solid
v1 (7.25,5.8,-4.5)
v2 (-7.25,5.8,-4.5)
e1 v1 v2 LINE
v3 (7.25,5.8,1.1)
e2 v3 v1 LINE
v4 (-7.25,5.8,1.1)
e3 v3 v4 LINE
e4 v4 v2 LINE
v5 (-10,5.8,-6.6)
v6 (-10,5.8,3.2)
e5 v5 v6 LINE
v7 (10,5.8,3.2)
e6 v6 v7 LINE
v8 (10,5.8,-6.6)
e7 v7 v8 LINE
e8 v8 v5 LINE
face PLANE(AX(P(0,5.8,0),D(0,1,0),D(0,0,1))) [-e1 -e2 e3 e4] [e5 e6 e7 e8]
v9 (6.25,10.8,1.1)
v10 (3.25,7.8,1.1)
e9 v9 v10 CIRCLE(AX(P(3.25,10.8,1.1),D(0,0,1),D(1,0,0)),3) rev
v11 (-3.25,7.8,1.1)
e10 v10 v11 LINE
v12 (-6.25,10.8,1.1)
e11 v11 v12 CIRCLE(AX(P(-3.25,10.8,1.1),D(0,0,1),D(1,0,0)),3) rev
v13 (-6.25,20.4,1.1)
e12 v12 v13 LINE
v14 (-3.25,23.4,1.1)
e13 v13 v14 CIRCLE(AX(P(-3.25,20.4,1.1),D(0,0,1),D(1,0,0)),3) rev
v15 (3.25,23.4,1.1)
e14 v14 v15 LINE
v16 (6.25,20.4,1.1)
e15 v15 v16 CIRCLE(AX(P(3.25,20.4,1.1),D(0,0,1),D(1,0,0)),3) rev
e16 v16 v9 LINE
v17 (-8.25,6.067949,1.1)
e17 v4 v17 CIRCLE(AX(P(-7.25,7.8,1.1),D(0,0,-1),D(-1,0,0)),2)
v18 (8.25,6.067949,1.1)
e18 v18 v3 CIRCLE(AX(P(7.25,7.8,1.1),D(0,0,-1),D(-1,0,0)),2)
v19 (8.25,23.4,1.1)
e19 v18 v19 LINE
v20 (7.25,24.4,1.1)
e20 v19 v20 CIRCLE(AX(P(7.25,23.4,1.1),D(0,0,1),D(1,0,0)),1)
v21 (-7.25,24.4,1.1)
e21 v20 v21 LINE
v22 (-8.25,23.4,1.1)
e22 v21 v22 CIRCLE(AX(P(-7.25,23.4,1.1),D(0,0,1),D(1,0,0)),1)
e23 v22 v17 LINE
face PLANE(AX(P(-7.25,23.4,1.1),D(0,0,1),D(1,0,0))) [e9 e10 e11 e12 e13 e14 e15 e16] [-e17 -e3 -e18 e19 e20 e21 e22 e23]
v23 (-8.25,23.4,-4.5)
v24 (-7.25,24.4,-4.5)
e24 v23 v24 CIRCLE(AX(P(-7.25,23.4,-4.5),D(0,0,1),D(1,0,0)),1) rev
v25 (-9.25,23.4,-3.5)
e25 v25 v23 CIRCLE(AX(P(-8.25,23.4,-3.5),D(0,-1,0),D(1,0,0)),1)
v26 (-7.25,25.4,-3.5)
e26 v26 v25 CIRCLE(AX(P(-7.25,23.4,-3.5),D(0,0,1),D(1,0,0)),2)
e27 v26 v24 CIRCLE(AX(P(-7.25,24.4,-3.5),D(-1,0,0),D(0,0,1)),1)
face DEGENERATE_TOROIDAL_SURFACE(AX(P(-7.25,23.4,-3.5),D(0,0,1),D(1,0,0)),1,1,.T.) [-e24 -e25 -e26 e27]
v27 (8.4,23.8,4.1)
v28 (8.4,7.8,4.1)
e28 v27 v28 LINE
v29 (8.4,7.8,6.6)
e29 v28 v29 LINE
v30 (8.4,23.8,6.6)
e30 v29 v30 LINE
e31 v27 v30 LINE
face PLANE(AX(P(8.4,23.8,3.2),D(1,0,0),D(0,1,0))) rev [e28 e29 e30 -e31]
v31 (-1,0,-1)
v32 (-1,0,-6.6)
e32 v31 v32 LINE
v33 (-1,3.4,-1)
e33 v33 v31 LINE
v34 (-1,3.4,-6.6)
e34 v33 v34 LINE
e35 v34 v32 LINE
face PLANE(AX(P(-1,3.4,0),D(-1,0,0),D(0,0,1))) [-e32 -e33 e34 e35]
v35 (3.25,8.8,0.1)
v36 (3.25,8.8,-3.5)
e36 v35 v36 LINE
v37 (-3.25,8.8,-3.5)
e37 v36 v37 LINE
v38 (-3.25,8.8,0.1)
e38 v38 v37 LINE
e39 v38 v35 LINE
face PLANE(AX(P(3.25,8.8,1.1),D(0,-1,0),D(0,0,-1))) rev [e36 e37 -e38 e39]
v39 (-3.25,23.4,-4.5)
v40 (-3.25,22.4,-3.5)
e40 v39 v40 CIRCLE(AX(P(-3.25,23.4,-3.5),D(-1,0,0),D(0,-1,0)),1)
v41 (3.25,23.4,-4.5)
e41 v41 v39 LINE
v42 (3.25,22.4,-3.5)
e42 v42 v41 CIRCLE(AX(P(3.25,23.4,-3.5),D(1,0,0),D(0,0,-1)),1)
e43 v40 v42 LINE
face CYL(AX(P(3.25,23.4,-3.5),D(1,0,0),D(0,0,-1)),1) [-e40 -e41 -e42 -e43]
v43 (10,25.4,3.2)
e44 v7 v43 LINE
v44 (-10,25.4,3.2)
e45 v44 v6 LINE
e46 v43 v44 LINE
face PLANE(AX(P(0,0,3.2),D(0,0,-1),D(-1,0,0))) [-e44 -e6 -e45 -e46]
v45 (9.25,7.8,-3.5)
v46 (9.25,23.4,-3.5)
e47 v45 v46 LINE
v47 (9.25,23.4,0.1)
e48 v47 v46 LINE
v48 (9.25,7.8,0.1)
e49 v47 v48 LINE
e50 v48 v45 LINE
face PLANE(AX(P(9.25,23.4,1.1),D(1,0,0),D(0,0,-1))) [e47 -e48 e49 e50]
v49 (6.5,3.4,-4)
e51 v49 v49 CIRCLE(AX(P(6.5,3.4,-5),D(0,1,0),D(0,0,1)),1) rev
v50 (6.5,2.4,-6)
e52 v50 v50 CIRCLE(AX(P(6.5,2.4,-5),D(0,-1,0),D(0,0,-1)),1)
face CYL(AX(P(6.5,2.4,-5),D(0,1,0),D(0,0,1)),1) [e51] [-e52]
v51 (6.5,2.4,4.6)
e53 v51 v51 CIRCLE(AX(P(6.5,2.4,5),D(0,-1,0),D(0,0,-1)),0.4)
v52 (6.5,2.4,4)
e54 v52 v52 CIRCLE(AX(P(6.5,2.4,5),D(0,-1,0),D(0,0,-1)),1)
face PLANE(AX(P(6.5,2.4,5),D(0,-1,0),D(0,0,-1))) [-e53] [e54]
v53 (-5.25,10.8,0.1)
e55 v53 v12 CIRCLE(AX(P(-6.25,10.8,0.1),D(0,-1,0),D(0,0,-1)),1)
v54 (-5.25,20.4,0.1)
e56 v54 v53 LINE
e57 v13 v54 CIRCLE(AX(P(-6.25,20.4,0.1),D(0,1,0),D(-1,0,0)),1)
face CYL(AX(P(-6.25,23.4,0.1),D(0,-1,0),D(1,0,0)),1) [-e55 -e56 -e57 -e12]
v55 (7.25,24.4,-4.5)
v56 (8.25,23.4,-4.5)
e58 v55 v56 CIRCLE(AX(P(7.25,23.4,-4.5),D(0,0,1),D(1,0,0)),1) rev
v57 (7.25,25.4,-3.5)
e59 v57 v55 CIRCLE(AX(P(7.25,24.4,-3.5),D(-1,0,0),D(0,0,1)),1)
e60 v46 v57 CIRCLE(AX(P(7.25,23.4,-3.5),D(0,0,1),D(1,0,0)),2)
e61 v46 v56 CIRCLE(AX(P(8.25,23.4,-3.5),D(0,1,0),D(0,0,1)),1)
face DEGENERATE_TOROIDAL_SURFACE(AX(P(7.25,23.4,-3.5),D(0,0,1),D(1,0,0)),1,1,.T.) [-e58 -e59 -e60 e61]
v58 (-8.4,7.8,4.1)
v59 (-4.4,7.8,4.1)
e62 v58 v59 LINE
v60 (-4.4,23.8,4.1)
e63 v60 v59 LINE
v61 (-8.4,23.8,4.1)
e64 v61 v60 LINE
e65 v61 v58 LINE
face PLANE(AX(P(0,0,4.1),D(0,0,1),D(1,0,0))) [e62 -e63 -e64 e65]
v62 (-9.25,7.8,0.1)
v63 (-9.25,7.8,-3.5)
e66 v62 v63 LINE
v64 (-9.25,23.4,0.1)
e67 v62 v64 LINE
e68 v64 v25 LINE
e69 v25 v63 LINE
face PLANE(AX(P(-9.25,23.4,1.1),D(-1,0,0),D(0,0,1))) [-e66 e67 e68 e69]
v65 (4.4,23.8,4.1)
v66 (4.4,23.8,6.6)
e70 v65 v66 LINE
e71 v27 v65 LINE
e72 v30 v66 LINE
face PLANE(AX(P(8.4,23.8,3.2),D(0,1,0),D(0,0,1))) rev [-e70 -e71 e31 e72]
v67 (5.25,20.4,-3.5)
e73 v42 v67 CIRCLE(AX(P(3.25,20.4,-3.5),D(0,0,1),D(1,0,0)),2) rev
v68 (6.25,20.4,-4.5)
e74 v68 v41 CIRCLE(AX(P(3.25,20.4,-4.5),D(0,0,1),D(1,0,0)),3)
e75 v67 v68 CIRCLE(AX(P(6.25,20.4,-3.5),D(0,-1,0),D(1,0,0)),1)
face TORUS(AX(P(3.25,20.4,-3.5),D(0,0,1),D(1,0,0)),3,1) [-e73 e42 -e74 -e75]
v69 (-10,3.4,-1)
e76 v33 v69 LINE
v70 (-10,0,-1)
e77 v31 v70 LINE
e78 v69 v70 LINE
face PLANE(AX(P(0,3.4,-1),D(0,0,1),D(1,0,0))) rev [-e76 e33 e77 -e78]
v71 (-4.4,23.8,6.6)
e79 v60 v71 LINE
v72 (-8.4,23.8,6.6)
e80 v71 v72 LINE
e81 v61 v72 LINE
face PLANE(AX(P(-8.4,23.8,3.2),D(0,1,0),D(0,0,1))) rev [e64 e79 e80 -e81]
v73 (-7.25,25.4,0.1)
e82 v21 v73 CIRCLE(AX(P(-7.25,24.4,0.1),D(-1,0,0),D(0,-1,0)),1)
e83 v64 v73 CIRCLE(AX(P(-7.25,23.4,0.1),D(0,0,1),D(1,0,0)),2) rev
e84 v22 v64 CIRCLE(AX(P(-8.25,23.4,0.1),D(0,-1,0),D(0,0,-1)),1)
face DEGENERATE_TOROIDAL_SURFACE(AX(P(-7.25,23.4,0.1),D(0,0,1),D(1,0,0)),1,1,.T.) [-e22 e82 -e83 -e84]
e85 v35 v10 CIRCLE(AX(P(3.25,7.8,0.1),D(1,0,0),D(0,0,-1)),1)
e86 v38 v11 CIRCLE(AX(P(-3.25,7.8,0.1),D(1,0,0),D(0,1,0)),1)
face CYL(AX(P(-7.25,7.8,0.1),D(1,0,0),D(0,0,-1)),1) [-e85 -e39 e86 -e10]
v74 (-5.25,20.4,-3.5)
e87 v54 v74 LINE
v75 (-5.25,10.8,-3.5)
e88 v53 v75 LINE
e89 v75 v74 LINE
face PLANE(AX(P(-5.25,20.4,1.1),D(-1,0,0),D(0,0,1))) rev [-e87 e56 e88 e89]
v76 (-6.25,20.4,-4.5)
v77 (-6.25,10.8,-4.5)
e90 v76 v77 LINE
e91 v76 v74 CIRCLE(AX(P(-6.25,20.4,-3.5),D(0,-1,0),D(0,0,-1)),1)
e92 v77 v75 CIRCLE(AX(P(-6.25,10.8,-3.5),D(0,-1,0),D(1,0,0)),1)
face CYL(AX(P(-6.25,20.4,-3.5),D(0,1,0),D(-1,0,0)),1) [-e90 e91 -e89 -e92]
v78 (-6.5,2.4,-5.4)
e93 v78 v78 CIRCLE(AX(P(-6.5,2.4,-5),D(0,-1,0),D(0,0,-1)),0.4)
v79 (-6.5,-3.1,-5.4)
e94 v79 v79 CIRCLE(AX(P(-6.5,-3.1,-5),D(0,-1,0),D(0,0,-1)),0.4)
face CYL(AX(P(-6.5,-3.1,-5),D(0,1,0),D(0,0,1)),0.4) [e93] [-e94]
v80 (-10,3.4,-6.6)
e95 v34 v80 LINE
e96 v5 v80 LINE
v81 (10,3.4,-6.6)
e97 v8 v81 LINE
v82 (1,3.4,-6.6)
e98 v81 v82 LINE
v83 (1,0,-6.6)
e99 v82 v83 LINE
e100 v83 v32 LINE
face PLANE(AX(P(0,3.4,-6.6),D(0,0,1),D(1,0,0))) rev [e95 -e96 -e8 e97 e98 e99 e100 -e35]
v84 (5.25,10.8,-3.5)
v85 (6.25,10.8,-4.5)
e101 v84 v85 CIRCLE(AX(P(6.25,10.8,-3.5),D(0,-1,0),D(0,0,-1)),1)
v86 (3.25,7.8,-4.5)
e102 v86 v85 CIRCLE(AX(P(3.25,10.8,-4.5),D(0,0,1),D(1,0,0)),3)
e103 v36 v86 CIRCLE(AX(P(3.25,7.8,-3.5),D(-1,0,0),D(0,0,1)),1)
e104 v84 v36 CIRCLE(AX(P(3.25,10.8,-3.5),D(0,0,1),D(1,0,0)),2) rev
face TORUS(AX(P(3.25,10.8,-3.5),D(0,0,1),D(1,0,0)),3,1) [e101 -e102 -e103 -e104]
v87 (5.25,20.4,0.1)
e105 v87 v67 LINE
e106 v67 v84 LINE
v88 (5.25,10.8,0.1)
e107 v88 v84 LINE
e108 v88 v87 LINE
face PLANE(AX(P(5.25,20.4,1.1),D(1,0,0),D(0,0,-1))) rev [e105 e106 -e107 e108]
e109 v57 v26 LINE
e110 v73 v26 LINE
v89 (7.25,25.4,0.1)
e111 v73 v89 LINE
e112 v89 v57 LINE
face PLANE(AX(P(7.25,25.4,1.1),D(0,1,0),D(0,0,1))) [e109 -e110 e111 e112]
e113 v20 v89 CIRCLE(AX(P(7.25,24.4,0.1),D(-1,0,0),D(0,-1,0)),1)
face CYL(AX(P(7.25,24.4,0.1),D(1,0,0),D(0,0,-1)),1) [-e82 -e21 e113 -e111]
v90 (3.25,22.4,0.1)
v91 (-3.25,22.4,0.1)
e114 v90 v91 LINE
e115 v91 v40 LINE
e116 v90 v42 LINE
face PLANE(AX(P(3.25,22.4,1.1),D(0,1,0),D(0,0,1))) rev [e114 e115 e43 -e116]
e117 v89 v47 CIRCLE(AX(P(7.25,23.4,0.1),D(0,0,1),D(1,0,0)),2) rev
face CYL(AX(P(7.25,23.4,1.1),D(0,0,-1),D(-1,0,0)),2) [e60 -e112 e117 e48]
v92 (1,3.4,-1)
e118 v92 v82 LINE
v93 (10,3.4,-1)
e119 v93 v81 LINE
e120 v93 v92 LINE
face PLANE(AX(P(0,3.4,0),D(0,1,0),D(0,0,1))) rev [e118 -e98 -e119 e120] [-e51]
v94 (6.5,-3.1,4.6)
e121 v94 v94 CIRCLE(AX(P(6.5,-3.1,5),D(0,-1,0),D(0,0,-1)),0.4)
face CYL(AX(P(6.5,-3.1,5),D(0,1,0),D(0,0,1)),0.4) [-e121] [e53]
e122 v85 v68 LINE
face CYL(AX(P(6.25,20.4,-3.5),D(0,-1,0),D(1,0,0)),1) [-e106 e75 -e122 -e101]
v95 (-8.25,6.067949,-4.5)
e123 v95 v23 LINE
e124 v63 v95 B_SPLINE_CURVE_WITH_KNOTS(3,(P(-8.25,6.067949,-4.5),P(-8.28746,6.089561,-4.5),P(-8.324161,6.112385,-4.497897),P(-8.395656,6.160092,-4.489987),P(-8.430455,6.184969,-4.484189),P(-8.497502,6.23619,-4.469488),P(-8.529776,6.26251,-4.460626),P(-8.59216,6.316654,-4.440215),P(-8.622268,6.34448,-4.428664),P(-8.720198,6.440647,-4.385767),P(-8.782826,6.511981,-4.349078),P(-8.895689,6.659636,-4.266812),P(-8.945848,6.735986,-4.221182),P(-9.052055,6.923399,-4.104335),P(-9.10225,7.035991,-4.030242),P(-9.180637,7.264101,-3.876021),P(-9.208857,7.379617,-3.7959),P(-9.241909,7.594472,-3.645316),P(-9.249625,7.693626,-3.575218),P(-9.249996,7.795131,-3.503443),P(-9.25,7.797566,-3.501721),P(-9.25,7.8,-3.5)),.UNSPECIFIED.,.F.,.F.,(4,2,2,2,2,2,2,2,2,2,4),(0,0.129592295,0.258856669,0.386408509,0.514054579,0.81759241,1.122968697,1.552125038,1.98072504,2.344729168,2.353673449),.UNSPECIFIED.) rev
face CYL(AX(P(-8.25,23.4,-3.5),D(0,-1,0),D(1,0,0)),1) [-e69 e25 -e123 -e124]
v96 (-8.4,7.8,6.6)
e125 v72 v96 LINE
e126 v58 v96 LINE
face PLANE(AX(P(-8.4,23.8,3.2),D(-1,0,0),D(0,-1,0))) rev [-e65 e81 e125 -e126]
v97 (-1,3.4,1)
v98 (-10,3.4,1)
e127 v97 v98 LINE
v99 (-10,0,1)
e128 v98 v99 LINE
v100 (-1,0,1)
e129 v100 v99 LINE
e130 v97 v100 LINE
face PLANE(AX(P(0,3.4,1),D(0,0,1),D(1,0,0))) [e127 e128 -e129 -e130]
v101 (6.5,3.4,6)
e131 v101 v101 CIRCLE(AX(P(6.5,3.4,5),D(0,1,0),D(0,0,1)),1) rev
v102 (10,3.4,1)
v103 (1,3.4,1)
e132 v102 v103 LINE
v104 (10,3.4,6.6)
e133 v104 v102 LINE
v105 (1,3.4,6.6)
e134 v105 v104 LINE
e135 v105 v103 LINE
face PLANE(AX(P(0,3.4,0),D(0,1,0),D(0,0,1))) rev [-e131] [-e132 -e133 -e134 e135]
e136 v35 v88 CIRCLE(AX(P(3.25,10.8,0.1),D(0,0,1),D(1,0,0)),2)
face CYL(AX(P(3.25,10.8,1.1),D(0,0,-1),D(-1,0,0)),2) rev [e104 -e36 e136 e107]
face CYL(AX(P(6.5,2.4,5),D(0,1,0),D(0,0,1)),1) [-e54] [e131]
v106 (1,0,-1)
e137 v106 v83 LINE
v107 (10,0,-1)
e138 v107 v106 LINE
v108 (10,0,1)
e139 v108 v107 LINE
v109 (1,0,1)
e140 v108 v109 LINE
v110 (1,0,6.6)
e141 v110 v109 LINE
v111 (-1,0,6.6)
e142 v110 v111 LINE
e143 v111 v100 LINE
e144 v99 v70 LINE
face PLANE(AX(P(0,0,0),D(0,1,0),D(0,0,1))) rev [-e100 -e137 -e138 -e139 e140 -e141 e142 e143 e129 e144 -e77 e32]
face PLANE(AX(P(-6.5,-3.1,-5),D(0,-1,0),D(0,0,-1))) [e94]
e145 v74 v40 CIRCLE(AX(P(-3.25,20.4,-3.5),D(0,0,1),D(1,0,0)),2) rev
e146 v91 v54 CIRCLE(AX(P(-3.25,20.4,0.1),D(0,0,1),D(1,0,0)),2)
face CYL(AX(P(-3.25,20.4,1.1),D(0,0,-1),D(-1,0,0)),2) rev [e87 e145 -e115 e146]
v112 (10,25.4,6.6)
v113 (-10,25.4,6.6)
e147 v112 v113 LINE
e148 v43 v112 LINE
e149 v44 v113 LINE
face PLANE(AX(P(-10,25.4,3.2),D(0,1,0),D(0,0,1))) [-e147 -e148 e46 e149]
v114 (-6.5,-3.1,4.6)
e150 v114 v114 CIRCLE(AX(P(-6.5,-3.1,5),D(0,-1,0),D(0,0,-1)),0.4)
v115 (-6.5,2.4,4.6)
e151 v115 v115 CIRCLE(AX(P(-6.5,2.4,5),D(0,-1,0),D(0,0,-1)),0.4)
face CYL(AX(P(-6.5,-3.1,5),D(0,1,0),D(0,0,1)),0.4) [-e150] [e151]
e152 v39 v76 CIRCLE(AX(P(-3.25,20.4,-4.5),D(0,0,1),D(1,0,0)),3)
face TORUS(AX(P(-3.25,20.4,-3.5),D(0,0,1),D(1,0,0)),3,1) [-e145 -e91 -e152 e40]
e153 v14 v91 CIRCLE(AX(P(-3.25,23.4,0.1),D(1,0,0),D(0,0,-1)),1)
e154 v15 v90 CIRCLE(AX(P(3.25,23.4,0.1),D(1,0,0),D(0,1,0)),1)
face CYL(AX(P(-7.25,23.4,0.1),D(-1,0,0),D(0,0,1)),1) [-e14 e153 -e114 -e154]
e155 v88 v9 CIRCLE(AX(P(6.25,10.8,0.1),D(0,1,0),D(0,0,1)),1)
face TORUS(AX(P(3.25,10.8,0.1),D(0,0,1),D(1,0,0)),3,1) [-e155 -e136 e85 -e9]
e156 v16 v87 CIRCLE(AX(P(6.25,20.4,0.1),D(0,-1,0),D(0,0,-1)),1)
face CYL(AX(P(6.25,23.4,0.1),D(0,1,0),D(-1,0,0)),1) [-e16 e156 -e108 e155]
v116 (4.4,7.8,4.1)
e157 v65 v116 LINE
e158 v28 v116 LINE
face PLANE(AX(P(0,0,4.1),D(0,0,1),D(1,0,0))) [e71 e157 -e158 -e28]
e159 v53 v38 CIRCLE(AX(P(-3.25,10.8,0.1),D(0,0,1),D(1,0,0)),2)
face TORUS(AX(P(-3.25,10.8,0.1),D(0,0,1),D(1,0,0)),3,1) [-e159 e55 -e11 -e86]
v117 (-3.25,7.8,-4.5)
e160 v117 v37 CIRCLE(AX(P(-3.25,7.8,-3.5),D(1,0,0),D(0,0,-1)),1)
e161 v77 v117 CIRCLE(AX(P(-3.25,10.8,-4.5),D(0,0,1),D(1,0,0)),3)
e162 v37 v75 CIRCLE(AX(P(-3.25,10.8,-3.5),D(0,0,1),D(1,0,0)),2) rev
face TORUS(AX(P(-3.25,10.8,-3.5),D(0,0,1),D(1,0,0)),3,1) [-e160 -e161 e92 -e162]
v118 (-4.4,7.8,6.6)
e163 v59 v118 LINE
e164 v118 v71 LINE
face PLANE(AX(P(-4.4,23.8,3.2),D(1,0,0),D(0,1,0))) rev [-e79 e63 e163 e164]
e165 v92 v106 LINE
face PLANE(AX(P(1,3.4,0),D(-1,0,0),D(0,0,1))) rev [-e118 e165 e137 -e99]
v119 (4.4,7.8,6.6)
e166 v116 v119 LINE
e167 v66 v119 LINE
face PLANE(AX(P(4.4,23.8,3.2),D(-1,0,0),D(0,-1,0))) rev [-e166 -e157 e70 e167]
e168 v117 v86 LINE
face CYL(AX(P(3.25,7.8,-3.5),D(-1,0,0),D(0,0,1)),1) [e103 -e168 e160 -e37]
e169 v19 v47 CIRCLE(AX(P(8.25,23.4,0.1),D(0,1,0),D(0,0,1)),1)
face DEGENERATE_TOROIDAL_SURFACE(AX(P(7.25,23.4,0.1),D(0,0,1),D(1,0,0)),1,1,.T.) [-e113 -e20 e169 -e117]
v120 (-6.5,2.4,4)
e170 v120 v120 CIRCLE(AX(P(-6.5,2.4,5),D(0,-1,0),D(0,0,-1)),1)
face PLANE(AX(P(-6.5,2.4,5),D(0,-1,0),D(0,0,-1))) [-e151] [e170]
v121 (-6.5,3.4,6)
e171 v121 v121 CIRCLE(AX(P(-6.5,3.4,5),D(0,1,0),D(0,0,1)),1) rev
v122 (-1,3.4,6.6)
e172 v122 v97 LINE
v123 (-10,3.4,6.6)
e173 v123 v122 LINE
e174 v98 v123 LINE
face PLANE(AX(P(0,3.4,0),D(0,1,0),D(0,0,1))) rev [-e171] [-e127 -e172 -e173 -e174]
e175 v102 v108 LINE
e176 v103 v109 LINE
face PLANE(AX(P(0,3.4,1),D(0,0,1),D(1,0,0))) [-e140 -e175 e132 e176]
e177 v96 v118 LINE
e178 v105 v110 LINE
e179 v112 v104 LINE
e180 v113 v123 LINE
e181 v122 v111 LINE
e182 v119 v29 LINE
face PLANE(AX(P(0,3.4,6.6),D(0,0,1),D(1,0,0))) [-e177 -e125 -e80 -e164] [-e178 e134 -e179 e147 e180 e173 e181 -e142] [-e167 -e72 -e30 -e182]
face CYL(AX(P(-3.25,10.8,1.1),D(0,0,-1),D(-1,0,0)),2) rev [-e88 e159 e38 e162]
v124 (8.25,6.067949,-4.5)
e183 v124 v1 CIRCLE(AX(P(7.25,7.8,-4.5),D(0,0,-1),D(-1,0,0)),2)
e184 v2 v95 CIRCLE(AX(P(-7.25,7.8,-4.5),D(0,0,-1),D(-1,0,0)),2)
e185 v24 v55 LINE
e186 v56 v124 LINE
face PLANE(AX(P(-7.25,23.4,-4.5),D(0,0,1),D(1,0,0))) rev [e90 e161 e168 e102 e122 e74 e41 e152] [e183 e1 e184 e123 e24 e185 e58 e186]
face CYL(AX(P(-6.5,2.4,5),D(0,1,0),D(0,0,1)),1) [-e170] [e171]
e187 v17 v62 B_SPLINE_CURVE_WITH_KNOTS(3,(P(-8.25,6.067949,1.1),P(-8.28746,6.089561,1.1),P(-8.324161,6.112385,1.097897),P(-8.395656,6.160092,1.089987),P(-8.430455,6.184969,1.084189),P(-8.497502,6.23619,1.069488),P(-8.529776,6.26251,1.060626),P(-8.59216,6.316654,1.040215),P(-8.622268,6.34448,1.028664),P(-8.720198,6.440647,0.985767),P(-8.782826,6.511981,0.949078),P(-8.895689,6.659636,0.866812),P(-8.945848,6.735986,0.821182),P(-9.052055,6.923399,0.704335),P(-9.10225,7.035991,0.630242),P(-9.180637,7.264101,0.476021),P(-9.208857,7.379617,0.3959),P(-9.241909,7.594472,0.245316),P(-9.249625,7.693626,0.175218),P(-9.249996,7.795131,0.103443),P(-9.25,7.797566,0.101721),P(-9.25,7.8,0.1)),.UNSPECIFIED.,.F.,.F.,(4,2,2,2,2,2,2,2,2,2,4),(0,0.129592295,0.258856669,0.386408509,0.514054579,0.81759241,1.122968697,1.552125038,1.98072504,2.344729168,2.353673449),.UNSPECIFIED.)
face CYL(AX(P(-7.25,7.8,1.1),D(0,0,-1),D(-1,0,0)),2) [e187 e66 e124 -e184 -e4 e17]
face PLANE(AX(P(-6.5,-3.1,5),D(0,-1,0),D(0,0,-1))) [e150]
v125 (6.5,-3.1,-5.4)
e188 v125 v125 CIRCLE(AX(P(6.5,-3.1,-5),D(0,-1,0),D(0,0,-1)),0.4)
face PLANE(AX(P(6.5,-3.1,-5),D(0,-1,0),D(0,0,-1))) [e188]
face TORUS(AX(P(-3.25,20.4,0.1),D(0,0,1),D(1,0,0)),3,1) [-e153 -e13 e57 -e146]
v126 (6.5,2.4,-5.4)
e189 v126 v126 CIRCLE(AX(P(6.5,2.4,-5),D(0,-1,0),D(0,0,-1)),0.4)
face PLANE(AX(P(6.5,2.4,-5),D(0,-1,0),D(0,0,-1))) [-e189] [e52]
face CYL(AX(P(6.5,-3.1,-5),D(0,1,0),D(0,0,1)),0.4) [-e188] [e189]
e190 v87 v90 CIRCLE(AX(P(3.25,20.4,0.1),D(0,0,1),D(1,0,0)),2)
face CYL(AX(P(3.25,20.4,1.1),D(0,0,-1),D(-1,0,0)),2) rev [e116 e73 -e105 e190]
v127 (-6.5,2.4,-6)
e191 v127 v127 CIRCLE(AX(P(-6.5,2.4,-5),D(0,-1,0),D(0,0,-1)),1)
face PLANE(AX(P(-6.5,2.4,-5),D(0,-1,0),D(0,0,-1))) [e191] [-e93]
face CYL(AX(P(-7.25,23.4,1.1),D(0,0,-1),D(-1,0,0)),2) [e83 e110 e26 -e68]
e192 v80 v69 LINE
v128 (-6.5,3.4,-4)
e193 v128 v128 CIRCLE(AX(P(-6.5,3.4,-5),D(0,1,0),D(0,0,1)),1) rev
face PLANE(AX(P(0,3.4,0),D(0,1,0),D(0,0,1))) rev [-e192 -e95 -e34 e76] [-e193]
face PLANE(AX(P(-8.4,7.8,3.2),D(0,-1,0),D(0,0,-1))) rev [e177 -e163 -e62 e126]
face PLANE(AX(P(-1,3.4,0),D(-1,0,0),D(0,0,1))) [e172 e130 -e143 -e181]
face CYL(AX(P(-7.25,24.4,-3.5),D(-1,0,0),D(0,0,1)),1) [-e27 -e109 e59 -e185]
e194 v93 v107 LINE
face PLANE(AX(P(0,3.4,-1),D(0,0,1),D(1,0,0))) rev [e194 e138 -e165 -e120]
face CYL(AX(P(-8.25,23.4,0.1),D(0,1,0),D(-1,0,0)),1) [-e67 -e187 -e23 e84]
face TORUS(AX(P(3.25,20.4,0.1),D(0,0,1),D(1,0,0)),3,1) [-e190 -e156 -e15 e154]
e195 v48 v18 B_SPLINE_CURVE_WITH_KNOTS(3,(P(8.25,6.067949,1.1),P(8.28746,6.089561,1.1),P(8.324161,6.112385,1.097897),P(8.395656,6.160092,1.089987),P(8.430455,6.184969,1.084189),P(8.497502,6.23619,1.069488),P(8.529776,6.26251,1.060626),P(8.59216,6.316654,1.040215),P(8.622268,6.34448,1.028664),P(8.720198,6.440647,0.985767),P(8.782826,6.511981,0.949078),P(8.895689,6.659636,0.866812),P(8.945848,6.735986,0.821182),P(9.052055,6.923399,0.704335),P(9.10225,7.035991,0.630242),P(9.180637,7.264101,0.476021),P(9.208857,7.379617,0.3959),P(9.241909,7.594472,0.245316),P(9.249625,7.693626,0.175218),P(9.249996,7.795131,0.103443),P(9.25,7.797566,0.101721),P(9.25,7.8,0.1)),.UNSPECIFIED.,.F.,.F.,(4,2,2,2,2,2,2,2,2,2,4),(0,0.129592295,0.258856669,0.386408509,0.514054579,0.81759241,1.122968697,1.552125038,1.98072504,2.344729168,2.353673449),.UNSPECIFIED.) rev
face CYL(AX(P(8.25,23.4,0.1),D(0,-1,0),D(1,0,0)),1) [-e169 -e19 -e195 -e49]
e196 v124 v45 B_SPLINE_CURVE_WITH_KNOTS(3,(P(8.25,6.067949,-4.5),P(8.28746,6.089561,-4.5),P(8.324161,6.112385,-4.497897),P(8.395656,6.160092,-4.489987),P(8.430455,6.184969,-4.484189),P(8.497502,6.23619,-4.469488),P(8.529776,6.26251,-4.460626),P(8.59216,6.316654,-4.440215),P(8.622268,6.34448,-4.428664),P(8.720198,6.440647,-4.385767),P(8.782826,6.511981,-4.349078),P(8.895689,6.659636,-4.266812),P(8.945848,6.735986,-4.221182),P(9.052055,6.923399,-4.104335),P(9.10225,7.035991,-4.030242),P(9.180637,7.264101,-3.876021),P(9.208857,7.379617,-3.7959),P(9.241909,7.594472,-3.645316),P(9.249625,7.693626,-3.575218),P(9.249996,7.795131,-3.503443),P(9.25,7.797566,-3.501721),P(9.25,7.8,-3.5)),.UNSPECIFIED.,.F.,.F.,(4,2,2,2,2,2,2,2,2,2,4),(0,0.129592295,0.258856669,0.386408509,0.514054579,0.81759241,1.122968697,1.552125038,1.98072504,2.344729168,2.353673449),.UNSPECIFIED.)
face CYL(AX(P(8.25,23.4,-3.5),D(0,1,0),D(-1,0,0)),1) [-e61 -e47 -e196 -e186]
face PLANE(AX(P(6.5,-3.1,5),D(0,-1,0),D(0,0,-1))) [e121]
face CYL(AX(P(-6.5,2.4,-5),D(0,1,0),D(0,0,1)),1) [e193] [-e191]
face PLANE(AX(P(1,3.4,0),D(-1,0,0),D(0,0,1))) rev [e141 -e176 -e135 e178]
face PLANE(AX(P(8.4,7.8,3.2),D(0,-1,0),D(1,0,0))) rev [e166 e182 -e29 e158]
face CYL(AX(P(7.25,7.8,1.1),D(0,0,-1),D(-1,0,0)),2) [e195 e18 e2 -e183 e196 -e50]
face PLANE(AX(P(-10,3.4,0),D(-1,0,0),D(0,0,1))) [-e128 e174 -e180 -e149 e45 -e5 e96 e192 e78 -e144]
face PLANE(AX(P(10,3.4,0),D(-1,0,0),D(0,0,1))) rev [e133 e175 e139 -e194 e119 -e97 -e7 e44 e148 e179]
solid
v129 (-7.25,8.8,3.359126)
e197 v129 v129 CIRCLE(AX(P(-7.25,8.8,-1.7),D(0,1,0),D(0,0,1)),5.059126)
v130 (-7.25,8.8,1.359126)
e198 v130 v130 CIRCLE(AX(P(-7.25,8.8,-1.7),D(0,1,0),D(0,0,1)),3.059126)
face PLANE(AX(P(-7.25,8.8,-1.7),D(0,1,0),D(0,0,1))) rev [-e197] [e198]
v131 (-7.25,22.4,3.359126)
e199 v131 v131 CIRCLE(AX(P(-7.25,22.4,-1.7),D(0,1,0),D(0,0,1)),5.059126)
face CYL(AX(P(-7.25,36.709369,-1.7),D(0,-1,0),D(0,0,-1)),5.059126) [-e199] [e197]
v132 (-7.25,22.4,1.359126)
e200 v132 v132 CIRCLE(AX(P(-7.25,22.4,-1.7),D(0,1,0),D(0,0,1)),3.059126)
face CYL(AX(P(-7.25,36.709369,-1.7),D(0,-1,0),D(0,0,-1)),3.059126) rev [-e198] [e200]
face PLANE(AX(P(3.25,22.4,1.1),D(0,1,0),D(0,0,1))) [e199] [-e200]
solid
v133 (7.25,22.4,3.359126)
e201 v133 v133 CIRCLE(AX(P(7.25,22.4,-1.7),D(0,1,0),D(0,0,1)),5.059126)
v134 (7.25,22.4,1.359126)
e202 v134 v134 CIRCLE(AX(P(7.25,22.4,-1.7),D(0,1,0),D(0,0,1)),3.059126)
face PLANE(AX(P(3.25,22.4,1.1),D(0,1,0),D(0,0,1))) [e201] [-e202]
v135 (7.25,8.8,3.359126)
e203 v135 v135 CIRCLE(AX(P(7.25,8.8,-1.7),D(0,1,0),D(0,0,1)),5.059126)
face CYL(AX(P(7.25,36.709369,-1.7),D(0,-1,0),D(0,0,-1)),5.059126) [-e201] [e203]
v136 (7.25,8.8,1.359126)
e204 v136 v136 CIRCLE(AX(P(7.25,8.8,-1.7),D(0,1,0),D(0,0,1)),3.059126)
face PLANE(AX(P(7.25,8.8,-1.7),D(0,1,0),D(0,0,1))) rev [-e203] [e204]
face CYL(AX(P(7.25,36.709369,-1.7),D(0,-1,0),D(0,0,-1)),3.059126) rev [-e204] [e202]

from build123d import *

# Parameters (mm, degrees)
SKETCH1_W                = 9
SKETCH1_H                = 2
SKETCH1_W_2              = 2
SKETCH1_H_2              = 5.6
BOSS_EXTRUDE1_DEPTH      = 3.4
SKETCH2_W                = 20
SKETCH2_H                = 13.2
BOSS_EXTRUDE2_DEPTH      = 2.4
SKETCH3_R                = 0.4
BOSS_EXTRUDE3_DEPTH      = 6.5
SKETCH4_R                = 1
BOSS_EXTRUDE4_DEPTH      = 1
SKETCH5_W                = 20
SKETCH5_H                = 19.6
SKETCH5_W_2              = 4
SKETCH5_H_2              = 16
BOSS_EXTRUDE5_DEPTH      = 3.4
BOSS_EXTRUDE6_START      = -2.5
SKETCH5_2_W              = 4
SKETCH5_2_H              = 16
BOSS_EXTRUDE6_DEPTH      = 0.9
BOSS_EXTRUDE7_DEPTH      = 2.8
BOSS_EXTRUDE7_DEPTH_BACK = 2.8
FILLET1_R                = 1
FILLET2_R                = 1
FILLET3_R                = 1
SKETCH7_R                = 5.059126028
SKETCH7_R_2              = 3.059126028
BOSS_EXTRUDE10_DEPTH     = 13.6
BOSS_EXTRUDE10_2_DEPTH   = 13.6


with BuildPart() as part:
    # Sketch1 → Boss-Extrude1 (new body)
    with BuildSketch(Plane(origin=(0, 0, 0), x_dir=(1, 0, 0), z_dir=(0, 1, 0))):
        with Locations((-5.5, 0)):
            Rectangle(SKETCH1_W, SKETCH1_H)
        Rectangle(SKETCH1_W_2, SKETCH1_H)
        with Locations((0, 3.8)):
            Rectangle(SKETCH1_W_2, SKETCH1_H_2)
        with Locations((0, -3.8)):
            Rectangle(SKETCH1_W_2, SKETCH1_H_2)
        with Locations((5.5, 0)):
            Rectangle(SKETCH1_W, SKETCH1_H)
    extrude(amount=BOSS_EXTRUDE1_DEPTH)

    # Sketch2 → Boss-Extrude2 (add)
    with BuildSketch(Plane(origin=(0, 3.4, 0), x_dir=(1, 0, 0), z_dir=(0, 1, 0))):
        Rectangle(SKETCH2_W, SKETCH2_H)
    extrude(amount=BOSS_EXTRUDE2_DEPTH)

    # Sketch3 → Boss-Extrude3 (add)
    with BuildSketch(Plane.XZ.offset(-3.4)):
        with Locations(Location((6.5, 5, 0), (0, 0, 90))):
            Circle(SKETCH3_R)
        with Locations(Location((-6.5, 5, 0), (0, 0, 90))):
            Circle(SKETCH3_R)
        with Locations(Location((-6.5, -5, 0), (0, 0, 90))):
            Circle(SKETCH3_R)
        with Locations(Location((6.5, -5, 0), (0, 0, 90))):
            Circle(SKETCH3_R)
    extrude(amount=BOSS_EXTRUDE3_DEPTH)

    # Sketch4 → Boss-Extrude4 (add)
    with BuildSketch(Plane.XZ.offset(-3.4)):
        with Locations(Location((6.5, 5, 0), (0, 0, 90))):
            Circle(SKETCH4_R)
        with Locations(Location((-6.5, 5, 0), (0, 0, 90))):
            Circle(SKETCH4_R)
        with Locations(Location((-6.5, -5, 0), (0, 0, 90))):
            Circle(SKETCH4_R)
        with Locations(Location((6.5, -5, 0), (0, 0, 90))):
            Circle(SKETCH4_R)
    extrude(amount=BOSS_EXTRUDE4_DEPTH)

    # Sketch5 → Boss-Extrude5 (add)
    with BuildSketch(Plane.XY.offset(6.6)):
        with Locations((0, 15.6)):
            Rectangle(SKETCH5_W, SKETCH5_H)
        with Locations((-6.4, 15.8)):
            Rectangle(SKETCH5_W_2, SKETCH5_H_2, mode=Mode.SUBTRACT)
        with Locations((6.4, 15.8)):
            Rectangle(SKETCH5_W_2, SKETCH5_H_2, mode=Mode.SUBTRACT)
    extrude(amount=-BOSS_EXTRUDE5_DEPTH)

    # Sketch5<2> → Boss-Extrude6 (add)
    with BuildSketch(Plane.XY.offset(6.6).offset(BOSS_EXTRUDE6_START)):
        with Locations((-6.4, 15.8)):
            Rectangle(SKETCH5_2_W, SKETCH5_2_H)
        with Locations((6.4, 15.8)):
            Rectangle(SKETCH5_2_W, SKETCH5_2_H)
    extrude(amount=-BOSS_EXTRUDE6_DEPTH)

    # Sketch6 → Boss-Extrude7 (add, two sides: drawn at the far end of the back side and taken through both)
    with BuildSketch(Plane(origin=(0, 0, -1.7), x_dir=(-1, 0, 0), z_dir=(0, 0, -1)).offset(-BOSS_EXTRUDE7_DEPTH_BACK)):
        with BuildLine():
            Line((-7.25, 25.4), (7.25, 25.4))
            ThreePointArc((7.25, 25.4), (8.664213562, 24.814213562), (9.25, 23.4))
            Line((9.25, 23.4), (9.25, 7.8))
            ThreePointArc((9.25, 7.8), (8.664213562, 6.385786438), (7.25, 5.8))
            Line((7.25, 5.8), (-7.25, 5.8))
            ThreePointArc((-7.25, 5.8), (-8.664213562, 6.385786438), (-9.25, 7.8))
            Line((-9.25, 7.8), (-9.25, 23.4))
            ThreePointArc((-9.25, 23.4), (-8.664213562, 24.814213562), (-7.25, 25.4))
        make_face()
        with BuildLine():
            Line((-3.25, 22.4), (3.25, 22.4))
            ThreePointArc((3.25, 22.4), (4.664213562, 21.814213562), (5.25, 20.4))
            Line((5.25, 20.4), (5.25, 10.8))
            ThreePointArc((5.25, 10.8), (4.664213562, 9.385786438), (3.25, 8.8))
            Line((3.25, 8.8), (-3.25, 8.8))
            ThreePointArc((-3.25, 8.8), (-4.664213562, 9.385786438), (-5.25, 10.8))
            Line((-5.25, 10.8), (-5.25, 20.4))
            ThreePointArc((-5.25, 20.4), (-4.664213562, 21.814213562), (-3.25, 22.4))
        make_face(mode=Mode.SUBTRACT)
    extrude(amount=BOSS_EXTRUDE7_DEPTH + BOSS_EXTRUDE7_DEPTH_BACK)

    # Fillet1
    fillet1_edges = [part.edges().sort_by_distance(p)[0] for p in [
        (4.664213562, 9.385786438, -4.5),
        (5.25, 15.6, -4.5),
        (4.664213562, 21.814213562, -4.5),
        (0, 22.4, -4.5),
        (-4.664213562, 21.814213562, -4.5),
        (-5.25, 15.6, -4.5),
        (-4.664213562, 9.385786438, -4.5),
        (0, 8.8, -4.5),
    ]]
    fillet(fillet1_edges, radius=FILLET1_R)

    # Fillet2
    fillet2_edges = [part.edges().sort_by_distance(p)[0] for p in [
        (4.664213562, 9.385786438, 1.1),
        (0, 8.8, 1.1),
        (-4.664213562, 9.385786438, 1.1),
        (-5.25, 15.6, 1.1),
        (-4.664213562, 21.814213562, 1.1),
        (0, 22.4, 1.1),
        (4.664213562, 21.814213562, 1.1),
        (5.25, 15.6, 1.1),
    ]]
    fillet(fillet2_edges, radius=FILLET2_R)

    # Fillet3
    # the kernel refuses this fillet: 1 mm, written as the material it takes off along each edge
    with BuildSketch(Plane(origin=(-7.25, 23.4, 1.1), x_dir=(0, 1, 0), z_dir=(1, 0, 0))) as fillet3_piece_1:
        with BuildLine():
            CenterArc((2 - FILLET3_R, -FILLET3_R), FILLET3_R, 0, 90)
            Line((2, -FILLET3_R), (2, 0))
            Line((2, 0), (2 - FILLET3_R, 0))
        make_face()
    revolve(axis=Axis((-7.25, 23.4, 1.1), (0, 0, 1)), revolution_arc=90, mode=Mode.SUBTRACT)
    with BuildSketch(Plane(origin=(-9.25, 23.4, 1.1), x_dir=(1, 0, 0), z_dir=(0, -1, 0))) as fillet3_piece_2_section:
        with BuildLine():
            CenterArc((FILLET3_R, -FILLET3_R), FILLET3_R, 90, 90)
            Line((0, -FILLET3_R), (0, 0))
            Line((0, 0), (FILLET3_R, 0))
        make_face()
    fillet3_piece_2 = extrude(amount=18.1, mode=Mode.PRIVATE)
    fillet3_piece_2 = split(fillet3_piece_2, bisect_by=Plane(origin=(-8.945227871, 5.8, 0.930013711), z_dir=(0, 1, 0)), keep=Keep.TOP, mode=Mode.PRIVATE)
    add(fillet3_piece_2, mode=Mode.SUBTRACT)
    with BuildSketch(Plane(origin=(9.25, 5.3, 1.1), x_dir=(-1, 0, 0), z_dir=(0, 1, 0))) as fillet3_piece_3_section:
        with BuildLine():
            CenterArc((FILLET3_R, -FILLET3_R), FILLET3_R, 90, 90)
            Line((0, -FILLET3_R), (0, 0))
            Line((0, 0), (FILLET3_R, 0))
        make_face()
    fillet3_piece_3 = extrude(amount=18.1, mode=Mode.PRIVATE)
    fillet3_piece_3 = split(fillet3_piece_3, bisect_by=Plane(origin=(8.945226786, 5.8, 0.930013735), z_dir=(0, 1, 0)), keep=Keep.TOP, mode=Mode.PRIVATE)
    add(fillet3_piece_3, mode=Mode.SUBTRACT)
    with BuildSketch(Plane(origin=(7.25, 23.4, 1.1), x_dir=(1, 0, 0), z_dir=(0, -1, 0))) as fillet3_piece_4:
        with BuildLine():
            CenterArc((2 - FILLET3_R, -FILLET3_R), FILLET3_R, 0, 90)
            Line((2, -FILLET3_R), (2, 0))
            Line((2, 0), (2 - FILLET3_R, 0))
        make_face()
    revolve(axis=Axis((7.25, 23.4, 1.1), (0, 0, 1)), revolution_arc=90, mode=Mode.SUBTRACT)
    with BuildSketch(Plane(origin=(7.25, 25.4, 1.1), x_dir=(0, -1, 0), z_dir=(-1, 0, 0))) as fillet3_piece_5:
        with BuildLine():
            CenterArc((FILLET3_R, -FILLET3_R), FILLET3_R, 90, 90)
            Line((0, -FILLET3_R), (0, 0))
            Line((0, 0), (FILLET3_R, 0))
        make_face()
    extrude(amount=14.5, mode=Mode.SUBTRACT)
    with BuildSketch(Plane(origin=(-7.25, 23.4, -4.5), x_dir=(0, 1, 0), z_dir=(1, 0, 0))) as fillet3_piece_6:
        with BuildLine():
            CenterArc((2 - FILLET3_R, FILLET3_R), FILLET3_R, 270, 90)
            Line((2, FILLET3_R), (2, 0))
            Line((2, 0), (2 - FILLET3_R, 0))
        make_face()
    revolve(axis=Axis((-7.25, 23.4, -4.5), (0, 0, 1)), revolution_arc=90, mode=Mode.SUBTRACT)
    with BuildSketch(Plane(origin=(7.25, 25.4, -4.5), x_dir=(0, -1, 0), z_dir=(-1, 0, 0))) as fillet3_piece_7:
        with BuildLine():
            CenterArc((FILLET3_R, FILLET3_R), FILLET3_R, 180, 90)
            Line((0, FILLET3_R), (0, 0))
            Line((0, 0), (FILLET3_R, 0))
        make_face()
    extrude(amount=14.5, mode=Mode.SUBTRACT)
    with BuildSketch(Plane(origin=(7.25, 23.4, -4.5), x_dir=(1, 0, 0), z_dir=(0, -1, 0))) as fillet3_piece_8:
        with BuildLine():
            CenterArc((2 - FILLET3_R, FILLET3_R), FILLET3_R, 270, 90)
            Line((2, FILLET3_R), (2, 0))
            Line((2, 0), (2 - FILLET3_R, 0))
        make_face()
    revolve(axis=Axis((7.25, 23.4, -4.5), (0, 0, 1)), revolution_arc=90, mode=Mode.SUBTRACT)
    with BuildSketch(Plane(origin=(9.25, 5.3, -4.5), x_dir=(-1, 0, 0), z_dir=(0, 1, 0))) as fillet3_piece_9_section:
        with BuildLine():
            CenterArc((FILLET3_R, FILLET3_R), FILLET3_R, 180, 90)
            Line((0, FILLET3_R), (0, 0))
            Line((0, 0), (FILLET3_R, 0))
        make_face()
    fillet3_piece_9 = extrude(amount=18.1, mode=Mode.PRIVATE)
    fillet3_piece_9 = split(fillet3_piece_9, bisect_by=Plane(origin=(8.945226723, 5.8, -4.330013641), z_dir=(0, 1, 0)), keep=Keep.TOP, mode=Mode.PRIVATE)
    add(fillet3_piece_9, mode=Mode.SUBTRACT)
    with BuildSketch(Plane(origin=(-9.25, 23.4, -4.5), x_dir=(1, 0, 0), z_dir=(0, -1, 0))) as fillet3_piece_10_section:
        with BuildLine():
            CenterArc((FILLET3_R, FILLET3_R), FILLET3_R, 180, 90)
            Line((0, FILLET3_R), (0, 0))
            Line((0, 0), (FILLET3_R, 0))
        make_face()
    fillet3_piece_10 = extrude(amount=18.1, mode=Mode.PRIVATE)
    fillet3_piece_10 = split(fillet3_piece_10, bisect_by=Plane(origin=(-8.945227871, 5.8, -4.330013708), z_dir=(0, 1, 0)), keep=Keep.TOP, mode=Mode.PRIVATE)
    add(fillet3_piece_10, mode=Mode.SUBTRACT)


with BuildPart() as body_2:
    # Sketch7 → Boss-Extrude10 (new body)
    with BuildSketch(Plane(origin=(0, 8.8, 0), x_dir=(1, 0, 0), z_dir=(0, 1, 0))):
        with Locations(Location((-7.25, 1.7, 0), (0, 0, 270))):
            Circle(SKETCH7_R)
        with Locations(Location((-7.25, 1.7, 0), (0, 0, 270))):
            Circle(SKETCH7_R_2, mode=Mode.SUBTRACT)
    extrude(amount=BOSS_EXTRUDE10_DEPTH)


with BuildPart() as body_3:
    # Sketch7 → Boss-Extrude10 2 (new body)
    with BuildSketch(Plane(origin=(0, 8.8, 0), x_dir=(1, 0, 0), z_dir=(0, 1, 0))):
        with Locations(Location((7.25, 1.7, 0), (0, 0, 270))):
            Circle(SKETCH7_R)
        with Locations(Location((7.25, 1.7, 0), (0, 0, 270))):
            Circle(SKETCH7_R_2, mode=Mode.SUBTRACT)
    extrude(amount=BOSS_EXTRUDE10_2_DEPTH)


solid = Compound([part.part, body_2.part, body_3.part])
